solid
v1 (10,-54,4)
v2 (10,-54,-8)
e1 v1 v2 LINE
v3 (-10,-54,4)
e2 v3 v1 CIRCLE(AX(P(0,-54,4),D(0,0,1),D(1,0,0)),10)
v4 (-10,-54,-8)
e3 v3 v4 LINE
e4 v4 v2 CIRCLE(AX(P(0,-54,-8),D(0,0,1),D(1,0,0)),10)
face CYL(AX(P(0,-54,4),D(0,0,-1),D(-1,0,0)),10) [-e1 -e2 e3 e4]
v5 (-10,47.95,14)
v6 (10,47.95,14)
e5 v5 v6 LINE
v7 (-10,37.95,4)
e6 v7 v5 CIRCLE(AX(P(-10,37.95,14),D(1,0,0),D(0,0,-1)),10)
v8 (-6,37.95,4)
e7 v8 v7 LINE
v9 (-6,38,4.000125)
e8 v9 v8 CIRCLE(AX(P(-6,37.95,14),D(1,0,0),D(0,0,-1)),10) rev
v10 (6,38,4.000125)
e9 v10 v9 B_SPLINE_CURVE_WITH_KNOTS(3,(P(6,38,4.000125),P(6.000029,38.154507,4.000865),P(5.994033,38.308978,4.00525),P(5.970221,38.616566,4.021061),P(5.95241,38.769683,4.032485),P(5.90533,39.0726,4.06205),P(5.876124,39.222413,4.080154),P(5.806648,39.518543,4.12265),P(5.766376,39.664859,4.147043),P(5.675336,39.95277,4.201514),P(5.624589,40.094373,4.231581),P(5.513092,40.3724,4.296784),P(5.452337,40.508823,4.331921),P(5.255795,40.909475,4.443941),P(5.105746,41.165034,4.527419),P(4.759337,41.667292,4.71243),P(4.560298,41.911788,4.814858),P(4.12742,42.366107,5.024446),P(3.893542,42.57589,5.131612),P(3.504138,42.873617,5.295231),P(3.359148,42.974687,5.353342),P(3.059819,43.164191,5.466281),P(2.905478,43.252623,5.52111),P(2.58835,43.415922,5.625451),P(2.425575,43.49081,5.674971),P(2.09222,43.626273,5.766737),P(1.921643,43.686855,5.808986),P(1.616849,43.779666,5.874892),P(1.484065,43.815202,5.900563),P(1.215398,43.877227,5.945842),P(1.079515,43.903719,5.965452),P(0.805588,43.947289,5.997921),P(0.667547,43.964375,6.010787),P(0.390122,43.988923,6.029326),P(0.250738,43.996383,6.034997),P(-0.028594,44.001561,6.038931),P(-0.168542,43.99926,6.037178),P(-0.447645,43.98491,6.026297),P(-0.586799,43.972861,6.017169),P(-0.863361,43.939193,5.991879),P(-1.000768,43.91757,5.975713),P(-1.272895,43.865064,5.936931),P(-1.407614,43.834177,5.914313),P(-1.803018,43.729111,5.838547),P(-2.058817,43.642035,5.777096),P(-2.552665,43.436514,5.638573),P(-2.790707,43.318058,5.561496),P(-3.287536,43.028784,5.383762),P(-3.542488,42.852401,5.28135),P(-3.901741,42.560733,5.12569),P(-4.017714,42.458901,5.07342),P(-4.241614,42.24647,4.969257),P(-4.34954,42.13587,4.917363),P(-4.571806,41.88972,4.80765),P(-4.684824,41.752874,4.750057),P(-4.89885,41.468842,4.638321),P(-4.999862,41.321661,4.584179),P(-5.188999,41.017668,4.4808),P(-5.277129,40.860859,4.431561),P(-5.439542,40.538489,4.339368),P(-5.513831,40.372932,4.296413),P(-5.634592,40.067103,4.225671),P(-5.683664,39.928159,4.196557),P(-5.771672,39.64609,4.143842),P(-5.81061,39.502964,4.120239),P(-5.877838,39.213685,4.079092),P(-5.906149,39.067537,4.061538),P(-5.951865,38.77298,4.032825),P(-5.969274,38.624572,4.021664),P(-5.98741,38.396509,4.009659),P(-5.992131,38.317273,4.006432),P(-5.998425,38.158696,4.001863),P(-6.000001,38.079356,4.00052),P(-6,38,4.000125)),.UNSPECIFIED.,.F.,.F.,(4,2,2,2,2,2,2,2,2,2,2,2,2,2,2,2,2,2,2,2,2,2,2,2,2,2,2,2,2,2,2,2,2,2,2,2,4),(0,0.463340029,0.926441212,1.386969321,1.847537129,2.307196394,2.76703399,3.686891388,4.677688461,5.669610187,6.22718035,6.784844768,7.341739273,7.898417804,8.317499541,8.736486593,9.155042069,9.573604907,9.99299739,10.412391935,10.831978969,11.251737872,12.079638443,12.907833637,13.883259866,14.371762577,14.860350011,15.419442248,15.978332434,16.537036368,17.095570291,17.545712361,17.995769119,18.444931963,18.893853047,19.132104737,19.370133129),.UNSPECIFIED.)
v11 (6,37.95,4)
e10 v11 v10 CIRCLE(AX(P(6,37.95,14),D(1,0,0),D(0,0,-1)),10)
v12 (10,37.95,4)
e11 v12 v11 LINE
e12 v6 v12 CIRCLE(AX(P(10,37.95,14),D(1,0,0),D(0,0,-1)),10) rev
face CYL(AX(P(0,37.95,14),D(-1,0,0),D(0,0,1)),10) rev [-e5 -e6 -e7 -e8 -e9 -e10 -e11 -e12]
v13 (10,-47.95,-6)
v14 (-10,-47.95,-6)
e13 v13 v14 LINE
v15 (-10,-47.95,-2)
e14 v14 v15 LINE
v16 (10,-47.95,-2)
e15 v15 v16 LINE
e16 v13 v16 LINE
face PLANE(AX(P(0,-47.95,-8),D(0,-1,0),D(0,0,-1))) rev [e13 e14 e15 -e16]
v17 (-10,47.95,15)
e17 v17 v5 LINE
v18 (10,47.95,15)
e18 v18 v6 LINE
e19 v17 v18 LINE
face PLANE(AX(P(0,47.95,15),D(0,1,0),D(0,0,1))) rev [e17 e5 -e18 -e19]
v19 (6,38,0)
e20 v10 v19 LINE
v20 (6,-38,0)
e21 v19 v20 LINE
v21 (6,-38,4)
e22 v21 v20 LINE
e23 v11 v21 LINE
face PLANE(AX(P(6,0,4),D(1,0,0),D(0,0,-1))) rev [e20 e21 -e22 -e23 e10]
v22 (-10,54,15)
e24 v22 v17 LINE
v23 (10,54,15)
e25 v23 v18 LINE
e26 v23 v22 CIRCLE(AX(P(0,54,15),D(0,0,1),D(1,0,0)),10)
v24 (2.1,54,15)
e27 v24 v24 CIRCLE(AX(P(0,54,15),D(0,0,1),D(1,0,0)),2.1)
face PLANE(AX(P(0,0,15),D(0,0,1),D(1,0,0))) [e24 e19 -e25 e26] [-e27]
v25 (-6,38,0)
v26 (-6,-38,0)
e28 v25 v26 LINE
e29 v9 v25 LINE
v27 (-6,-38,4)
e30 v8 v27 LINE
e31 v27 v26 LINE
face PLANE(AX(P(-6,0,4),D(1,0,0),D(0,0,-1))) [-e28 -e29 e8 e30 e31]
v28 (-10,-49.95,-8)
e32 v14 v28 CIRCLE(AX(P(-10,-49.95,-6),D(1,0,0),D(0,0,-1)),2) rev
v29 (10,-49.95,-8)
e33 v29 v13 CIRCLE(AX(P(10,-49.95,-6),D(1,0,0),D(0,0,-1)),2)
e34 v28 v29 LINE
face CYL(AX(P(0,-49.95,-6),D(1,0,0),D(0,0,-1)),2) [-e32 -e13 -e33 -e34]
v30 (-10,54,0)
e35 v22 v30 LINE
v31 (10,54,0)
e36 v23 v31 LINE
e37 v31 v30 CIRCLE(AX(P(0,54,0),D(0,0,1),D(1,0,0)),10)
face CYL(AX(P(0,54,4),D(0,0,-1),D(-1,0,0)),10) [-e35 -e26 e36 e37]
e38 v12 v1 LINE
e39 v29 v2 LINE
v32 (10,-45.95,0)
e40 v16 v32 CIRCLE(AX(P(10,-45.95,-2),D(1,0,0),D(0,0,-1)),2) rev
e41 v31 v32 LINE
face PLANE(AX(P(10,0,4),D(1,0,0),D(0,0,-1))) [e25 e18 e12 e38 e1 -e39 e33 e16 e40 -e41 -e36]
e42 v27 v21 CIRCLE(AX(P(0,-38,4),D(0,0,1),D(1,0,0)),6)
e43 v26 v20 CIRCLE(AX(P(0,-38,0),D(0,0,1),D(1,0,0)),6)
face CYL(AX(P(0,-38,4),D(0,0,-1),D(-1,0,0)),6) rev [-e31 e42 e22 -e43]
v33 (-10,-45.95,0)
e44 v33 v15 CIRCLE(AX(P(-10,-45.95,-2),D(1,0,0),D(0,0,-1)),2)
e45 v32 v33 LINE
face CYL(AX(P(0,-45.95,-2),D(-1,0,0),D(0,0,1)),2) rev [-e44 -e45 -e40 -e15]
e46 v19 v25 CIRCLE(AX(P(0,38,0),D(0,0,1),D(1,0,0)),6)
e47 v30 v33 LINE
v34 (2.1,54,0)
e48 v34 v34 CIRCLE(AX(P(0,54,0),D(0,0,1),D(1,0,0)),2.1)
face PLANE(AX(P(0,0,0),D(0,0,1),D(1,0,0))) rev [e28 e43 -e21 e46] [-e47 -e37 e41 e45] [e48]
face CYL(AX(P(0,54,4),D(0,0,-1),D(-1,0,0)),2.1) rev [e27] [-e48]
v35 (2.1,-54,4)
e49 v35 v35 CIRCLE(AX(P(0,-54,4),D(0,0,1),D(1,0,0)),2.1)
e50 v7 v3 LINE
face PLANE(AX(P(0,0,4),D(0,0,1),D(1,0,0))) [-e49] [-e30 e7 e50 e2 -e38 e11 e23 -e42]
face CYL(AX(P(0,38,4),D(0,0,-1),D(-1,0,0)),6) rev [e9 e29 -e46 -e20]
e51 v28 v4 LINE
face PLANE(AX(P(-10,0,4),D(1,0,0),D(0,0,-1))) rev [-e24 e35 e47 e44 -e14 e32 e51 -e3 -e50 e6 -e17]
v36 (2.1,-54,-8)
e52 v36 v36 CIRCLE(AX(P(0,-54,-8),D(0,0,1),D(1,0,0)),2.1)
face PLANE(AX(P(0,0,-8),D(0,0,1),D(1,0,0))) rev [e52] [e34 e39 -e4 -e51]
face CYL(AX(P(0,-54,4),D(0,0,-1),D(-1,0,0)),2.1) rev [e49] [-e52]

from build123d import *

# Parameters (mm, degrees)
CROQUIS1_R              = 2.1
SALIENTE_EXTRUIR1_DEPTH = 4
SALIENTE_EXTRUIR2_START = -8
CROQUIS1_5_R            = 2.1
SALIENTE_EXTRUIR2_DEPTH = 8
REDONDEO2_R             = 2
CROQUIS1_6_R            = 2.1
SALIENTE_EXTRUIR3_DEPTH = 15
REDONDEO1_R             = 10


with BuildPart() as part:
    # Croquis1 → Saliente-Extruir1 (new body)
    with BuildSketch(Plane.XY):
        with BuildLine():
            Line((10, 54), (10, -54))
            ThreePointArc((10, -54), (0, -64), (-10, -54))
            Line((-10, -54), (-10, 54))
            ThreePointArc((-10, 54), (0, 64), (10, 54))
        make_face()
        with Locations((0, 54)):
            Circle(CROQUIS1_R, mode=Mode.SUBTRACT)
        with Locations((0, -54)):
            Circle(CROQUIS1_R, mode=Mode.SUBTRACT)
        with BuildLine():
            Line((6, 38), (6, -38))
            ThreePointArc((6, -38), (0, -44), (-6, -38))
            Line((-6, -38), (-6, 38))
            ThreePointArc((-6, 38), (0, 44), (6, 38))
        make_face(mode=Mode.SUBTRACT)
    extrude(amount=SALIENTE_EXTRUIR1_DEPTH)

    # Croquis1<5> → Saliente-Extruir2 (add)
    with BuildSketch(Plane.XY.offset(SALIENTE_EXTRUIR2_START)):
        with BuildLine():
            Line((10, -54), (10, -47.95))
            Line((10, -47.95), (-10, -47.95))
            Line((-10, -47.95), (-10, -54))
            ThreePointArc((-10, -54), (0, -64), (10, -54))
        make_face()
        with Locations((0, -54)):
            Circle(CROQUIS1_5_R, mode=Mode.SUBTRACT)
    extrude(amount=SALIENTE_EXTRUIR2_DEPTH)

    # Redondeo2
    redondeo2_edges = [part.edges().sort_by_distance(p)[0] for p in [
        (0, -47.95, 0),
        (0, -47.95, -8),
    ]]
    fillet(redondeo2_edges, radius=REDONDEO2_R)

    # Croquis1<6> → Saliente-Extruir3 (add)
    with BuildSketch(Plane.XY):
        with BuildLine():
            Line((10, 47.95), (10, 54))
            ThreePointArc((10, 54), (0, 64), (-10, 54))
            Line((-10, 54), (-10, 47.95))
            Line((-10, 47.95), (10, 47.95))
        make_face()
        with Locations((0, 54)):
            Circle(CROQUIS1_6_R, mode=Mode.SUBTRACT)
    extrude(amount=SALIENTE_EXTRUIR3_DEPTH)

    # Redondeo1
    # the kernel refuses this fillet: 10 mm, written as the material it adds along each edge
    with BuildSketch(Plane(origin=(-10, 47.95, 4), x_dir=(0, 0, 1), z_dir=(1, 0, 0))) as redondeo1_piece_1_section:
        with BuildLine():
            CenterArc((REDONDEO1_R, REDONDEO1_R), REDONDEO1_R, 180, 90)
            Line((0, REDONDEO1_R), (0, 0))
            Line((0, 0), (REDONDEO1_R, 0))
        make_face()
    redondeo1_piece_1 = extrude(amount=20, mode=Mode.PRIVATE)
    redondeo1_piece_1 = redondeo1_piece_1 - Plane(origin=(0, 38, 6.263951143), x_dir=(-1, 0, 0), z_dir=(0, 0, -1)) * Cylinder(6, 80, mode=Mode.PRIVATE)
    add(redondeo1_piece_1)


solid = part.part
